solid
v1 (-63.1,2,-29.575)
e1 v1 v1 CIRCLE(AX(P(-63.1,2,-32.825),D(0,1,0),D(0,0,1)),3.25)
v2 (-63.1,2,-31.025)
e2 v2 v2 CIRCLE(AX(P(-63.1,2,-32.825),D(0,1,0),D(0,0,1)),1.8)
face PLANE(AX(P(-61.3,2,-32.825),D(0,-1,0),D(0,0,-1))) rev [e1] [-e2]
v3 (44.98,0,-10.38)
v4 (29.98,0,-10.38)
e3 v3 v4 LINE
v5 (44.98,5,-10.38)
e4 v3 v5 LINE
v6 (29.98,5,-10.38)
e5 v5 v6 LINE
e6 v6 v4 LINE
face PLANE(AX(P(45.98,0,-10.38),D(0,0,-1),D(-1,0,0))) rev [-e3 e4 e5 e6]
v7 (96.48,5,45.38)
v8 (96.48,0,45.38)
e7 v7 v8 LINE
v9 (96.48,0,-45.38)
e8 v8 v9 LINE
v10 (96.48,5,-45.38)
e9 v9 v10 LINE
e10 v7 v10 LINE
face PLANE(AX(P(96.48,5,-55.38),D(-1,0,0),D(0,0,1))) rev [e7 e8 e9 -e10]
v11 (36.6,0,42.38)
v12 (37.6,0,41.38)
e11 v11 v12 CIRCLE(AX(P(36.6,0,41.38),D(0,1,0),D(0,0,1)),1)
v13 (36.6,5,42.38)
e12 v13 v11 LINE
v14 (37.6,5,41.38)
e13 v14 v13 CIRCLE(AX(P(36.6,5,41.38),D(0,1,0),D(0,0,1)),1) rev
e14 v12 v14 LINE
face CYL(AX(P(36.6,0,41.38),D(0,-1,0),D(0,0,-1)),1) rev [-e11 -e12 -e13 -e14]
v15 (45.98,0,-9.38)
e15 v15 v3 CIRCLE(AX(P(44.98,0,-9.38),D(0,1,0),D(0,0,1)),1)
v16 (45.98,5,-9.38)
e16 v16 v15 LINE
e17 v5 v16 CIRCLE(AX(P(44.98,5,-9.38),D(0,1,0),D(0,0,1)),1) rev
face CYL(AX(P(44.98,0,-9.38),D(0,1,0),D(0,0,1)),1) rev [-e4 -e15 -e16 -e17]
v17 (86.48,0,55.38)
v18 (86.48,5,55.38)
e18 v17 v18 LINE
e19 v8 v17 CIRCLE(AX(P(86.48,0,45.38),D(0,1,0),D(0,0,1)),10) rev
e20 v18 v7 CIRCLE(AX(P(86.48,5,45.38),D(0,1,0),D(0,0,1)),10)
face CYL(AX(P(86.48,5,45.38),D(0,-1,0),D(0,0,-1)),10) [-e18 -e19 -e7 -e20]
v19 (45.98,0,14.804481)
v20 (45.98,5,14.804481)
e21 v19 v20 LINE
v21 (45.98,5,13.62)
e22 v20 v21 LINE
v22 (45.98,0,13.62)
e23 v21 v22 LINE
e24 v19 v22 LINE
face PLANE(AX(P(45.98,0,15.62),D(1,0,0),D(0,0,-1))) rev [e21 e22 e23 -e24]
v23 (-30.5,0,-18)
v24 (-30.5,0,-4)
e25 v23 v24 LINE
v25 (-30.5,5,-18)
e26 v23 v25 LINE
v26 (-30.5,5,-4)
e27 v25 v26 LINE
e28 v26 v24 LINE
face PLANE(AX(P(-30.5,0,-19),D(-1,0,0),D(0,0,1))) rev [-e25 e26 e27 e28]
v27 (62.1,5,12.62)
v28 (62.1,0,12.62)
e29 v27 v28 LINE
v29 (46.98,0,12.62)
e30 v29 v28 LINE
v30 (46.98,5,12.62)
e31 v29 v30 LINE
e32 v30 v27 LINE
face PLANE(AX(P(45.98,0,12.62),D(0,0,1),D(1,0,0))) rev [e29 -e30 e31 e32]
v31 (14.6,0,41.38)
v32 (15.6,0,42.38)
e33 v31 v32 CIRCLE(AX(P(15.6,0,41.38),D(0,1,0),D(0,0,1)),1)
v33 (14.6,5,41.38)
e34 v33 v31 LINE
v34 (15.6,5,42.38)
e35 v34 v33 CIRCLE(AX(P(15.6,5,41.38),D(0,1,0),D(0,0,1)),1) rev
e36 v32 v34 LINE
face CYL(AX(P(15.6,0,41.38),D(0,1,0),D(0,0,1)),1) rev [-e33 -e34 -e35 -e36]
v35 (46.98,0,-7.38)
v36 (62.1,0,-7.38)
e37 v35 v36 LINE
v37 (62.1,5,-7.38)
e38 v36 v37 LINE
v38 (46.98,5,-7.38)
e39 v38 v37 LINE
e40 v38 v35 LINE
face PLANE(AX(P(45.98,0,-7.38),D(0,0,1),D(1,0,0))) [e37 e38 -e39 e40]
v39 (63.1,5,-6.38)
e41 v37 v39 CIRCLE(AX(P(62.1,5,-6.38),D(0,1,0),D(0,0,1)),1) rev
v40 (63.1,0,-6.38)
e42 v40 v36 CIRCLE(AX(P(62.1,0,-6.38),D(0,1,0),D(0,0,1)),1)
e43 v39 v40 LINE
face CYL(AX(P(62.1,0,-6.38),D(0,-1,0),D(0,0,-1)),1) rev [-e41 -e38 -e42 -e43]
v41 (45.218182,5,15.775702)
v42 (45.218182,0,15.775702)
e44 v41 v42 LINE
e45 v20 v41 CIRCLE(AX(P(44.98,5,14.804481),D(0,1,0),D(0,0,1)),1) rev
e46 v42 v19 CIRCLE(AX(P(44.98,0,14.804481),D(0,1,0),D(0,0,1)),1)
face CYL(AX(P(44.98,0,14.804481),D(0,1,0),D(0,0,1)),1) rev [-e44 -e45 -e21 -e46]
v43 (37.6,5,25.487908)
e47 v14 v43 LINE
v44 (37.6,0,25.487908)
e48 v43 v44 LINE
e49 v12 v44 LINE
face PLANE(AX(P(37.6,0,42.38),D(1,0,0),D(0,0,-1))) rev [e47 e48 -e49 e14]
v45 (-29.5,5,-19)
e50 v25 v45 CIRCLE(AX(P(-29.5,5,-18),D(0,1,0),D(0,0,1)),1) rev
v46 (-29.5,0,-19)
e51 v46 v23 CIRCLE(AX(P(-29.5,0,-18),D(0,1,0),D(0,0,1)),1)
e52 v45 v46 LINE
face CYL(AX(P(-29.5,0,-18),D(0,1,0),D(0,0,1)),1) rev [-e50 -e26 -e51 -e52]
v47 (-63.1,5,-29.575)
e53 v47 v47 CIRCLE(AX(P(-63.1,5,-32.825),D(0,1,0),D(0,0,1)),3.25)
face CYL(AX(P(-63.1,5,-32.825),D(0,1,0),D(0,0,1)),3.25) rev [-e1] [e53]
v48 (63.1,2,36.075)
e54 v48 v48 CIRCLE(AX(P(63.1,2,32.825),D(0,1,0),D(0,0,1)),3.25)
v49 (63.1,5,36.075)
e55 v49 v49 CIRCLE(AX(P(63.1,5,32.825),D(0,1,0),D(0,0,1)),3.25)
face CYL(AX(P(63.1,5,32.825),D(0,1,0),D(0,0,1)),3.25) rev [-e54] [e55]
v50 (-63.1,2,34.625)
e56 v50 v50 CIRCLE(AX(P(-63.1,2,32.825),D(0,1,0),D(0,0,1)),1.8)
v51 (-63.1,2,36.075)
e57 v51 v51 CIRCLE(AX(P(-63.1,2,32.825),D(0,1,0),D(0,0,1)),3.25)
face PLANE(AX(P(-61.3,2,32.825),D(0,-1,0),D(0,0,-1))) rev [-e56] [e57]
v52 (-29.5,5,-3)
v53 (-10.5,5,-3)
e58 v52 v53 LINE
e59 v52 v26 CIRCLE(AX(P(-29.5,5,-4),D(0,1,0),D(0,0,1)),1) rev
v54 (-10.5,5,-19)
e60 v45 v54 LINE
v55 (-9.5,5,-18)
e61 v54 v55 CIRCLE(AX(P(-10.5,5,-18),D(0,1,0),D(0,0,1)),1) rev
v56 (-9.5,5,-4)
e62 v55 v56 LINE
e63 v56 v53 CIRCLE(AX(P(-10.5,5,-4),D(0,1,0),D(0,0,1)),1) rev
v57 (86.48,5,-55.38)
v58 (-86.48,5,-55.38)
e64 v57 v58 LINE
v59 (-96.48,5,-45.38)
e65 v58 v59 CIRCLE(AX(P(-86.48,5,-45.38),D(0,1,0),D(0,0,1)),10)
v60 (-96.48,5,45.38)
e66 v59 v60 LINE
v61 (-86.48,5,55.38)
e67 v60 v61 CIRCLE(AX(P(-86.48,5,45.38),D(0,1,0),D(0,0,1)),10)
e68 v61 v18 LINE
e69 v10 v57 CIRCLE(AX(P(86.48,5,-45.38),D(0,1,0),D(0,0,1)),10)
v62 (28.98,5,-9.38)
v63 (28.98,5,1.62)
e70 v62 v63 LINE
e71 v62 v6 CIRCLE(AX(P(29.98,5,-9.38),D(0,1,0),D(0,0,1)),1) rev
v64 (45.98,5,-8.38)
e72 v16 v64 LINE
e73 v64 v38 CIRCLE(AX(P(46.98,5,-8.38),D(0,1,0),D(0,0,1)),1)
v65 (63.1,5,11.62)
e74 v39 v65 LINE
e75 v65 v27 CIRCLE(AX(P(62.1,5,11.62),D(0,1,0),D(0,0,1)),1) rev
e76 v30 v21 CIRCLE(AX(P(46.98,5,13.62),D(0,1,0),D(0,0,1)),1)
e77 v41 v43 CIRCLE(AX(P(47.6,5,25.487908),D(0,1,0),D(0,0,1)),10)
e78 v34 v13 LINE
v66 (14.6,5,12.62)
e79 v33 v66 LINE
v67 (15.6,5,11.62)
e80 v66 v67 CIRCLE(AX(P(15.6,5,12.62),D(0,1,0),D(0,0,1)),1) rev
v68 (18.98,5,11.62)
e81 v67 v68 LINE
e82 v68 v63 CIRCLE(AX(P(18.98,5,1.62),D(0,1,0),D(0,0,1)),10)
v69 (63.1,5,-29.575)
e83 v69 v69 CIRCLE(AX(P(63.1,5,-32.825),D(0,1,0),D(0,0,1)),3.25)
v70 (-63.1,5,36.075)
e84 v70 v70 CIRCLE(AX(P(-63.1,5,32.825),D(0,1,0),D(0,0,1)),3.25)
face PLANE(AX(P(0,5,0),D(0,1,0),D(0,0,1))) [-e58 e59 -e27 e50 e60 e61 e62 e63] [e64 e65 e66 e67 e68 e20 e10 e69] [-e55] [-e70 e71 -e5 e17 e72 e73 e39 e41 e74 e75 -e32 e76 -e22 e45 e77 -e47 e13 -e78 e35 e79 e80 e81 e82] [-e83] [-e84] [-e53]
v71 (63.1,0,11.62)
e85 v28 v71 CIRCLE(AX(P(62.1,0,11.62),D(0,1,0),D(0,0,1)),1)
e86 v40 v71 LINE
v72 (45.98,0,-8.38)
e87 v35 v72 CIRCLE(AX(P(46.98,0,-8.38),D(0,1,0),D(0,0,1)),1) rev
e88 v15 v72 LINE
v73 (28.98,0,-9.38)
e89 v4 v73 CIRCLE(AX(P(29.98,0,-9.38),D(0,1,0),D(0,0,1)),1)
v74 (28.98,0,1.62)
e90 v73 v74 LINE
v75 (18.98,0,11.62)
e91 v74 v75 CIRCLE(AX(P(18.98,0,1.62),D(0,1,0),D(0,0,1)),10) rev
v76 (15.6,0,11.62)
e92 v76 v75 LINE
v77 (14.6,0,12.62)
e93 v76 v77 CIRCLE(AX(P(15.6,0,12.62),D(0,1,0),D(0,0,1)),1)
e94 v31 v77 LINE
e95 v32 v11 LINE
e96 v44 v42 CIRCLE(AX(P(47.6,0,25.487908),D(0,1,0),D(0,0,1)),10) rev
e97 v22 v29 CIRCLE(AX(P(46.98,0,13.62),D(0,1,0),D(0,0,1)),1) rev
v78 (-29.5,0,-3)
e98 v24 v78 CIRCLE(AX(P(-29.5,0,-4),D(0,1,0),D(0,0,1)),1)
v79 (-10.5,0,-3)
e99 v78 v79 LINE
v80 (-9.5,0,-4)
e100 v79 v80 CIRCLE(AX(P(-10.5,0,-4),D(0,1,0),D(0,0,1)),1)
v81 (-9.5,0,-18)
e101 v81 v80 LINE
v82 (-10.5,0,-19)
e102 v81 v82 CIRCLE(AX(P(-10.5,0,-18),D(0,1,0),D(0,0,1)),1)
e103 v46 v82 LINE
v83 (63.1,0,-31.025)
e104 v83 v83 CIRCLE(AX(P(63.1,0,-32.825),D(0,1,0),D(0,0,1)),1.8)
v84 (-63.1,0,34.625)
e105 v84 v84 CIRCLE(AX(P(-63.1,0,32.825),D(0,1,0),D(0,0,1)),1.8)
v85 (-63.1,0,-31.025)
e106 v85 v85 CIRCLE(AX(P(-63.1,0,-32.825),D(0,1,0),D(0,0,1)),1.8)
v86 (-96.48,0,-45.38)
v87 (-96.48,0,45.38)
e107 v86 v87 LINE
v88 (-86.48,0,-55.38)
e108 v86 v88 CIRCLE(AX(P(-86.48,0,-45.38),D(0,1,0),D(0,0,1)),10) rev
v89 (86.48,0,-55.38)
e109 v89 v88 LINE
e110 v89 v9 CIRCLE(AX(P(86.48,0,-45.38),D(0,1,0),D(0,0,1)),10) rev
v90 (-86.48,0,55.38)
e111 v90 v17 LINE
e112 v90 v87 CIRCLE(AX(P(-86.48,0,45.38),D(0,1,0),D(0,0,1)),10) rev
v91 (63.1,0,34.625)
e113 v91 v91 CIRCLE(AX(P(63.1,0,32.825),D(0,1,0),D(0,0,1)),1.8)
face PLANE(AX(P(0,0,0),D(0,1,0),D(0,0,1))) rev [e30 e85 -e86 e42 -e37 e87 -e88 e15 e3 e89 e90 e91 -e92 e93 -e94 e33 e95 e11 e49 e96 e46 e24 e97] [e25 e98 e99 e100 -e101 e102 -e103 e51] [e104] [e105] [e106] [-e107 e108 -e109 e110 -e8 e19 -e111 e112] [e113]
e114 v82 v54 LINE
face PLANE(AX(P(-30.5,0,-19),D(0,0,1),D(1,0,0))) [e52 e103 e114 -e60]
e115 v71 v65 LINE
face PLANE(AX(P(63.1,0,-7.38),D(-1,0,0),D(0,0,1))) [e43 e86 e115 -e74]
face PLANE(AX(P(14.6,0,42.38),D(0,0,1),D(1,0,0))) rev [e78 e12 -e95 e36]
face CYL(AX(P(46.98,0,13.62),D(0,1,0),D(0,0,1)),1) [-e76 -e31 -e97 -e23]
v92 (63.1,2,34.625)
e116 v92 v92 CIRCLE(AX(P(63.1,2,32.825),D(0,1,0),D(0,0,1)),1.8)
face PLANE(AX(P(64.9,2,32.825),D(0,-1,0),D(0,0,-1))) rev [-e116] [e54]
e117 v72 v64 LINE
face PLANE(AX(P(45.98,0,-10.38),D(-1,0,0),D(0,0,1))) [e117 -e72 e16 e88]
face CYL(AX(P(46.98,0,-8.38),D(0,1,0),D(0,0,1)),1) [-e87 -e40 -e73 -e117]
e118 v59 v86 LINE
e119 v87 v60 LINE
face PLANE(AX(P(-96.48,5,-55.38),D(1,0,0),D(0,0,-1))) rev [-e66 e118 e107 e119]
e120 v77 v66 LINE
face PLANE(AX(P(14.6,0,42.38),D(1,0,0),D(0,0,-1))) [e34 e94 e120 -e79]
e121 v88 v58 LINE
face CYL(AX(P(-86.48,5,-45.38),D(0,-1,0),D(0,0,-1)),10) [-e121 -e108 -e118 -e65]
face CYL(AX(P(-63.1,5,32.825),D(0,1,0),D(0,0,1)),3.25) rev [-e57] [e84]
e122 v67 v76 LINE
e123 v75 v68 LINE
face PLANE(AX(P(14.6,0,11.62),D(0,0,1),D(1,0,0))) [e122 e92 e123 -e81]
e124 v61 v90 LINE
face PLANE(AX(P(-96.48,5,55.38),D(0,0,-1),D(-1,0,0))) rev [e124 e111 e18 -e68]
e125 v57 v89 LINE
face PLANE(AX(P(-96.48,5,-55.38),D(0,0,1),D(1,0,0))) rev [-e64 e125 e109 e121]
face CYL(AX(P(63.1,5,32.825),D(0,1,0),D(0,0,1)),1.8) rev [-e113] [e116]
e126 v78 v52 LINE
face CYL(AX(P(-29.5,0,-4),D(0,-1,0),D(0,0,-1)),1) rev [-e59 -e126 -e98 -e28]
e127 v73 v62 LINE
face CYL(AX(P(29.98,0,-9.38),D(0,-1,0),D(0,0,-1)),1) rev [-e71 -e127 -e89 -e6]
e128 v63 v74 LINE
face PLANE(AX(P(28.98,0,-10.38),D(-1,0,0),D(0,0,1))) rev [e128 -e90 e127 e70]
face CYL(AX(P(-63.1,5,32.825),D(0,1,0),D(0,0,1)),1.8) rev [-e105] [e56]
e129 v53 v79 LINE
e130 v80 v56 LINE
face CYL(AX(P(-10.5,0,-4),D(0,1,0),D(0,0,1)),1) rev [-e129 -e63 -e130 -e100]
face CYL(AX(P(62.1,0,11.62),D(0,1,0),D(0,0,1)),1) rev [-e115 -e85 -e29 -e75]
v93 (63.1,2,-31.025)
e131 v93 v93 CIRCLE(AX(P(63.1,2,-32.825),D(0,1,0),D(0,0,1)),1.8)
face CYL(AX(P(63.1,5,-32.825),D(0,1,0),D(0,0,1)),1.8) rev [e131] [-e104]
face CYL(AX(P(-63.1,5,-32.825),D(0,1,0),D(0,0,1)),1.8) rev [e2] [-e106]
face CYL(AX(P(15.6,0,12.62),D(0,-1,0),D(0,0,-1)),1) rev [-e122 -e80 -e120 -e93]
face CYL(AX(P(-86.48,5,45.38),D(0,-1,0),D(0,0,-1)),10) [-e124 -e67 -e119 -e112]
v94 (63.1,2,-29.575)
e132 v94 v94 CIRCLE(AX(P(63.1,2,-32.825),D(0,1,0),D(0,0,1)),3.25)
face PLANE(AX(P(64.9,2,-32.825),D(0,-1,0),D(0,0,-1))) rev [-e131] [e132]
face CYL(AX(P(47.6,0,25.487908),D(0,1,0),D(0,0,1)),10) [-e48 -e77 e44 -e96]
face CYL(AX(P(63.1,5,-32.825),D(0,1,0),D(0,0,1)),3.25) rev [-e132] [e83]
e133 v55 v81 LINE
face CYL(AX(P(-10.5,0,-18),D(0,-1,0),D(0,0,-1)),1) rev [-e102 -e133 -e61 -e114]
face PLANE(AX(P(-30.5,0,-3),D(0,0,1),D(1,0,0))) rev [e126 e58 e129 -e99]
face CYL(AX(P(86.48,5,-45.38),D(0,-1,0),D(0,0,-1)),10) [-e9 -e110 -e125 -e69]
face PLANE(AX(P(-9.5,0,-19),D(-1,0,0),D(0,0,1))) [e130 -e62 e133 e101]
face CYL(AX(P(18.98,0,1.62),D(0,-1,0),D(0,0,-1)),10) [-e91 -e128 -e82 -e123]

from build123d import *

# Parameters (mm, degrees)
SKETCH1_W                      = 192.96
SKETCH1_H                      = 110.76
BOSS_EXTRUDE1_DEPTH            = 5
CBORE_START                    = 2
CBORE_FOR_M3_SHCS1_OUTLINE_R   = 3.25
CBORE_FOR_M3_SHCS1_DEPTH       = 3
CBORE_FOR_M3_SHCS1_2_OUTLINE_R = 1.8
CBORE_FOR_M3_SHCS1_2_DEPTH     = 2
SKETCH9_W                      = 21
SKETCH9_H                      = 16
CUT_EXTRUDE1_DEPTH             = 112.356790543
FILLET1_R                      = 10
FILLET2_R                      = 10
FILLET3_R                      = 1


# Read off the part's stored shape, not the designer's step: CBORE for M3 SHCS1
with BuildPart() as part:
    # Sketch1 → Boss-Extrude1 (new body)
    with BuildSketch(Plane(origin=(0, 0, 0), x_dir=(1, 0, 0), z_dir=(0, 1, 0))):
        Rectangle(SKETCH1_W, SKETCH1_H)
    extrude(amount=BOSS_EXTRUDE1_DEPTH)

    # CBORE for M3 SHCS1 outline → CBORE for M3 SHCS1 (cut)
    with BuildSketch(Plane(origin=(0, 0, 0), x_dir=(1, 0, 0), z_dir=(0, 1, 0)).offset(CBORE_START)):
        with Locations((63.1, -32.825)):
            Circle(CBORE_FOR_M3_SHCS1_OUTLINE_R)
        with Locations((-63.1, 32.825)):
            Circle(CBORE_FOR_M3_SHCS1_OUTLINE_R)
        with Locations((-63.1, -32.825)):
            Circle(CBORE_FOR_M3_SHCS1_OUTLINE_R)
        with Locations((63.1, 32.825)):
            Circle(CBORE_FOR_M3_SHCS1_OUTLINE_R)
    extrude(amount=CBORE_FOR_M3_SHCS1_DEPTH, mode=Mode.SUBTRACT)

    # CBORE for M3 SHCS1 2 outline → CBORE for M3 SHCS1 2 (cut)
    with BuildSketch(Plane(origin=(0, 0, 0), x_dir=(1, 0, 0), z_dir=(0, 1, 0))):
        with Locations((63.1, -32.825)):
            Circle(CBORE_FOR_M3_SHCS1_2_OUTLINE_R)
        with Locations((-63.1, 32.825)):
            Circle(CBORE_FOR_M3_SHCS1_2_OUTLINE_R)
        with Locations((-63.1, -32.825)):
            Circle(CBORE_FOR_M3_SHCS1_2_OUTLINE_R)
        with Locations((63.1, 32.825)):
            Circle(CBORE_FOR_M3_SHCS1_2_OUTLINE_R)
    extrude(amount=CBORE_FOR_M3_SHCS1_2_DEPTH, mode=Mode.SUBTRACT)

    # Sketch9 → Cut-Extrude1 (cut, through all)
    with BuildSketch(Plane(origin=(0, 5, 0), x_dir=(1, 0, 0), z_dir=(0, 1, 0))):
        Polygon((45.98, 10.38), (28.98, 10.38), (28.98, -11.62), (14.6, -11.62), (14.6, -42.38), (37.6, -42.38), (37.6, -15.62), (45.98, -15.62), (45.98, -12.62), (63.1, -12.62), (63.1, 7.38), (45.98, 7.38), align=None)
        with Locations((-20, 11)):
            Rectangle(SKETCH9_W, SKETCH9_H)
    extrude(amount=-CUT_EXTRUDE1_DEPTH, mode=Mode.SUBTRACT)

    # Fillet1
    fillet1_edges = [part.edges().sort_by_distance(p)[0] for p in [
        (-96.48, 2.5, -55.38),
        (96.48, 2.5, -55.38),
        (96.48, 2.5, 55.38),
        (-96.48, 2.5, 55.38),
    ]]
    fillet(fillet1_edges, radius=FILLET1_R)

    # Fillet2
    # the kernel refuses this fillet: 10 mm, written as the material it takes off along each edge
    with BuildSketch(Plane(origin=(37.6, 29.669768949, 15.62), x_dir=(1, 0, 0), z_dir=(0, -1, 0))) as fillet2_piece_1:
        with BuildLine():
            CenterArc((10, 9.86790758), FILLET2_R, 180, 80.676997523)
            Line((0, 9.86790758), (-0.2, 9.86790758))
            Line((-0.2, 9.86790758), (-0.2, 0))
            Line((-0.2, 0), (0, -0.2))
            ThreePointArc((0, -0.2), (4.19, -0.2), (8.3476, -0.197358152))
            Line((8.3476, -0.197358152), (8.38, 0))
        make_face()
    extrude(amount=54.339537898, mode=Mode.SUBTRACT)
    with BuildSketch(Plane(origin=(28.98, 30, 11.62), x_dir=(-1, 0, 0), z_dir=(0, -1, 0))) as fillet2_piece_2:
        with BuildLine():
            CenterArc((FILLET2_R, FILLET2_R), FILLET2_R, 180, 90)
            Line((0, FILLET2_R), (-FILLET2_R * 0.02, FILLET2_R))
            Line((-FILLET2_R * 0.02, FILLET2_R), (-FILLET2_R * 0.02, -FILLET2_R * 0.02))
            Line((-FILLET2_R * 0.02, -FILLET2_R * 0.02), (FILLET2_R, -FILLET2_R * 0.02))
            Line((FILLET2_R, -FILLET2_R * 0.02), (FILLET2_R, 0))
        make_face()
    extrude(amount=55, mode=Mode.SUBTRACT)

    # Fillet3
    fillet3_edges = [part.edges().sort_by_distance(p)[0] for p in [
        (-30.5, 2.5, -3),
        (-30.5, 2.5, -19),
        (-9.5, 2.5, -19),
        (-9.5, 2.5, -3),
        (45.98, 2.5, -10.38),
        (45.98, 2.5, -7.38),
        (63.1, 2.5, -7.38),
        (63.1, 2.5, 12.62),
        (45.98, 2.5, 12.62),
        (45.98, 2.5, 15.62),
        (37.6, 2.5, 42.38),
        (14.6, 2.5, 42.38),
        (14.6, 2.5, 11.62),
        (28.98, 2.5, -10.38),
    ]]
    fillet(fillet3_edges, radius=FILLET3_R)


solid = part.part
